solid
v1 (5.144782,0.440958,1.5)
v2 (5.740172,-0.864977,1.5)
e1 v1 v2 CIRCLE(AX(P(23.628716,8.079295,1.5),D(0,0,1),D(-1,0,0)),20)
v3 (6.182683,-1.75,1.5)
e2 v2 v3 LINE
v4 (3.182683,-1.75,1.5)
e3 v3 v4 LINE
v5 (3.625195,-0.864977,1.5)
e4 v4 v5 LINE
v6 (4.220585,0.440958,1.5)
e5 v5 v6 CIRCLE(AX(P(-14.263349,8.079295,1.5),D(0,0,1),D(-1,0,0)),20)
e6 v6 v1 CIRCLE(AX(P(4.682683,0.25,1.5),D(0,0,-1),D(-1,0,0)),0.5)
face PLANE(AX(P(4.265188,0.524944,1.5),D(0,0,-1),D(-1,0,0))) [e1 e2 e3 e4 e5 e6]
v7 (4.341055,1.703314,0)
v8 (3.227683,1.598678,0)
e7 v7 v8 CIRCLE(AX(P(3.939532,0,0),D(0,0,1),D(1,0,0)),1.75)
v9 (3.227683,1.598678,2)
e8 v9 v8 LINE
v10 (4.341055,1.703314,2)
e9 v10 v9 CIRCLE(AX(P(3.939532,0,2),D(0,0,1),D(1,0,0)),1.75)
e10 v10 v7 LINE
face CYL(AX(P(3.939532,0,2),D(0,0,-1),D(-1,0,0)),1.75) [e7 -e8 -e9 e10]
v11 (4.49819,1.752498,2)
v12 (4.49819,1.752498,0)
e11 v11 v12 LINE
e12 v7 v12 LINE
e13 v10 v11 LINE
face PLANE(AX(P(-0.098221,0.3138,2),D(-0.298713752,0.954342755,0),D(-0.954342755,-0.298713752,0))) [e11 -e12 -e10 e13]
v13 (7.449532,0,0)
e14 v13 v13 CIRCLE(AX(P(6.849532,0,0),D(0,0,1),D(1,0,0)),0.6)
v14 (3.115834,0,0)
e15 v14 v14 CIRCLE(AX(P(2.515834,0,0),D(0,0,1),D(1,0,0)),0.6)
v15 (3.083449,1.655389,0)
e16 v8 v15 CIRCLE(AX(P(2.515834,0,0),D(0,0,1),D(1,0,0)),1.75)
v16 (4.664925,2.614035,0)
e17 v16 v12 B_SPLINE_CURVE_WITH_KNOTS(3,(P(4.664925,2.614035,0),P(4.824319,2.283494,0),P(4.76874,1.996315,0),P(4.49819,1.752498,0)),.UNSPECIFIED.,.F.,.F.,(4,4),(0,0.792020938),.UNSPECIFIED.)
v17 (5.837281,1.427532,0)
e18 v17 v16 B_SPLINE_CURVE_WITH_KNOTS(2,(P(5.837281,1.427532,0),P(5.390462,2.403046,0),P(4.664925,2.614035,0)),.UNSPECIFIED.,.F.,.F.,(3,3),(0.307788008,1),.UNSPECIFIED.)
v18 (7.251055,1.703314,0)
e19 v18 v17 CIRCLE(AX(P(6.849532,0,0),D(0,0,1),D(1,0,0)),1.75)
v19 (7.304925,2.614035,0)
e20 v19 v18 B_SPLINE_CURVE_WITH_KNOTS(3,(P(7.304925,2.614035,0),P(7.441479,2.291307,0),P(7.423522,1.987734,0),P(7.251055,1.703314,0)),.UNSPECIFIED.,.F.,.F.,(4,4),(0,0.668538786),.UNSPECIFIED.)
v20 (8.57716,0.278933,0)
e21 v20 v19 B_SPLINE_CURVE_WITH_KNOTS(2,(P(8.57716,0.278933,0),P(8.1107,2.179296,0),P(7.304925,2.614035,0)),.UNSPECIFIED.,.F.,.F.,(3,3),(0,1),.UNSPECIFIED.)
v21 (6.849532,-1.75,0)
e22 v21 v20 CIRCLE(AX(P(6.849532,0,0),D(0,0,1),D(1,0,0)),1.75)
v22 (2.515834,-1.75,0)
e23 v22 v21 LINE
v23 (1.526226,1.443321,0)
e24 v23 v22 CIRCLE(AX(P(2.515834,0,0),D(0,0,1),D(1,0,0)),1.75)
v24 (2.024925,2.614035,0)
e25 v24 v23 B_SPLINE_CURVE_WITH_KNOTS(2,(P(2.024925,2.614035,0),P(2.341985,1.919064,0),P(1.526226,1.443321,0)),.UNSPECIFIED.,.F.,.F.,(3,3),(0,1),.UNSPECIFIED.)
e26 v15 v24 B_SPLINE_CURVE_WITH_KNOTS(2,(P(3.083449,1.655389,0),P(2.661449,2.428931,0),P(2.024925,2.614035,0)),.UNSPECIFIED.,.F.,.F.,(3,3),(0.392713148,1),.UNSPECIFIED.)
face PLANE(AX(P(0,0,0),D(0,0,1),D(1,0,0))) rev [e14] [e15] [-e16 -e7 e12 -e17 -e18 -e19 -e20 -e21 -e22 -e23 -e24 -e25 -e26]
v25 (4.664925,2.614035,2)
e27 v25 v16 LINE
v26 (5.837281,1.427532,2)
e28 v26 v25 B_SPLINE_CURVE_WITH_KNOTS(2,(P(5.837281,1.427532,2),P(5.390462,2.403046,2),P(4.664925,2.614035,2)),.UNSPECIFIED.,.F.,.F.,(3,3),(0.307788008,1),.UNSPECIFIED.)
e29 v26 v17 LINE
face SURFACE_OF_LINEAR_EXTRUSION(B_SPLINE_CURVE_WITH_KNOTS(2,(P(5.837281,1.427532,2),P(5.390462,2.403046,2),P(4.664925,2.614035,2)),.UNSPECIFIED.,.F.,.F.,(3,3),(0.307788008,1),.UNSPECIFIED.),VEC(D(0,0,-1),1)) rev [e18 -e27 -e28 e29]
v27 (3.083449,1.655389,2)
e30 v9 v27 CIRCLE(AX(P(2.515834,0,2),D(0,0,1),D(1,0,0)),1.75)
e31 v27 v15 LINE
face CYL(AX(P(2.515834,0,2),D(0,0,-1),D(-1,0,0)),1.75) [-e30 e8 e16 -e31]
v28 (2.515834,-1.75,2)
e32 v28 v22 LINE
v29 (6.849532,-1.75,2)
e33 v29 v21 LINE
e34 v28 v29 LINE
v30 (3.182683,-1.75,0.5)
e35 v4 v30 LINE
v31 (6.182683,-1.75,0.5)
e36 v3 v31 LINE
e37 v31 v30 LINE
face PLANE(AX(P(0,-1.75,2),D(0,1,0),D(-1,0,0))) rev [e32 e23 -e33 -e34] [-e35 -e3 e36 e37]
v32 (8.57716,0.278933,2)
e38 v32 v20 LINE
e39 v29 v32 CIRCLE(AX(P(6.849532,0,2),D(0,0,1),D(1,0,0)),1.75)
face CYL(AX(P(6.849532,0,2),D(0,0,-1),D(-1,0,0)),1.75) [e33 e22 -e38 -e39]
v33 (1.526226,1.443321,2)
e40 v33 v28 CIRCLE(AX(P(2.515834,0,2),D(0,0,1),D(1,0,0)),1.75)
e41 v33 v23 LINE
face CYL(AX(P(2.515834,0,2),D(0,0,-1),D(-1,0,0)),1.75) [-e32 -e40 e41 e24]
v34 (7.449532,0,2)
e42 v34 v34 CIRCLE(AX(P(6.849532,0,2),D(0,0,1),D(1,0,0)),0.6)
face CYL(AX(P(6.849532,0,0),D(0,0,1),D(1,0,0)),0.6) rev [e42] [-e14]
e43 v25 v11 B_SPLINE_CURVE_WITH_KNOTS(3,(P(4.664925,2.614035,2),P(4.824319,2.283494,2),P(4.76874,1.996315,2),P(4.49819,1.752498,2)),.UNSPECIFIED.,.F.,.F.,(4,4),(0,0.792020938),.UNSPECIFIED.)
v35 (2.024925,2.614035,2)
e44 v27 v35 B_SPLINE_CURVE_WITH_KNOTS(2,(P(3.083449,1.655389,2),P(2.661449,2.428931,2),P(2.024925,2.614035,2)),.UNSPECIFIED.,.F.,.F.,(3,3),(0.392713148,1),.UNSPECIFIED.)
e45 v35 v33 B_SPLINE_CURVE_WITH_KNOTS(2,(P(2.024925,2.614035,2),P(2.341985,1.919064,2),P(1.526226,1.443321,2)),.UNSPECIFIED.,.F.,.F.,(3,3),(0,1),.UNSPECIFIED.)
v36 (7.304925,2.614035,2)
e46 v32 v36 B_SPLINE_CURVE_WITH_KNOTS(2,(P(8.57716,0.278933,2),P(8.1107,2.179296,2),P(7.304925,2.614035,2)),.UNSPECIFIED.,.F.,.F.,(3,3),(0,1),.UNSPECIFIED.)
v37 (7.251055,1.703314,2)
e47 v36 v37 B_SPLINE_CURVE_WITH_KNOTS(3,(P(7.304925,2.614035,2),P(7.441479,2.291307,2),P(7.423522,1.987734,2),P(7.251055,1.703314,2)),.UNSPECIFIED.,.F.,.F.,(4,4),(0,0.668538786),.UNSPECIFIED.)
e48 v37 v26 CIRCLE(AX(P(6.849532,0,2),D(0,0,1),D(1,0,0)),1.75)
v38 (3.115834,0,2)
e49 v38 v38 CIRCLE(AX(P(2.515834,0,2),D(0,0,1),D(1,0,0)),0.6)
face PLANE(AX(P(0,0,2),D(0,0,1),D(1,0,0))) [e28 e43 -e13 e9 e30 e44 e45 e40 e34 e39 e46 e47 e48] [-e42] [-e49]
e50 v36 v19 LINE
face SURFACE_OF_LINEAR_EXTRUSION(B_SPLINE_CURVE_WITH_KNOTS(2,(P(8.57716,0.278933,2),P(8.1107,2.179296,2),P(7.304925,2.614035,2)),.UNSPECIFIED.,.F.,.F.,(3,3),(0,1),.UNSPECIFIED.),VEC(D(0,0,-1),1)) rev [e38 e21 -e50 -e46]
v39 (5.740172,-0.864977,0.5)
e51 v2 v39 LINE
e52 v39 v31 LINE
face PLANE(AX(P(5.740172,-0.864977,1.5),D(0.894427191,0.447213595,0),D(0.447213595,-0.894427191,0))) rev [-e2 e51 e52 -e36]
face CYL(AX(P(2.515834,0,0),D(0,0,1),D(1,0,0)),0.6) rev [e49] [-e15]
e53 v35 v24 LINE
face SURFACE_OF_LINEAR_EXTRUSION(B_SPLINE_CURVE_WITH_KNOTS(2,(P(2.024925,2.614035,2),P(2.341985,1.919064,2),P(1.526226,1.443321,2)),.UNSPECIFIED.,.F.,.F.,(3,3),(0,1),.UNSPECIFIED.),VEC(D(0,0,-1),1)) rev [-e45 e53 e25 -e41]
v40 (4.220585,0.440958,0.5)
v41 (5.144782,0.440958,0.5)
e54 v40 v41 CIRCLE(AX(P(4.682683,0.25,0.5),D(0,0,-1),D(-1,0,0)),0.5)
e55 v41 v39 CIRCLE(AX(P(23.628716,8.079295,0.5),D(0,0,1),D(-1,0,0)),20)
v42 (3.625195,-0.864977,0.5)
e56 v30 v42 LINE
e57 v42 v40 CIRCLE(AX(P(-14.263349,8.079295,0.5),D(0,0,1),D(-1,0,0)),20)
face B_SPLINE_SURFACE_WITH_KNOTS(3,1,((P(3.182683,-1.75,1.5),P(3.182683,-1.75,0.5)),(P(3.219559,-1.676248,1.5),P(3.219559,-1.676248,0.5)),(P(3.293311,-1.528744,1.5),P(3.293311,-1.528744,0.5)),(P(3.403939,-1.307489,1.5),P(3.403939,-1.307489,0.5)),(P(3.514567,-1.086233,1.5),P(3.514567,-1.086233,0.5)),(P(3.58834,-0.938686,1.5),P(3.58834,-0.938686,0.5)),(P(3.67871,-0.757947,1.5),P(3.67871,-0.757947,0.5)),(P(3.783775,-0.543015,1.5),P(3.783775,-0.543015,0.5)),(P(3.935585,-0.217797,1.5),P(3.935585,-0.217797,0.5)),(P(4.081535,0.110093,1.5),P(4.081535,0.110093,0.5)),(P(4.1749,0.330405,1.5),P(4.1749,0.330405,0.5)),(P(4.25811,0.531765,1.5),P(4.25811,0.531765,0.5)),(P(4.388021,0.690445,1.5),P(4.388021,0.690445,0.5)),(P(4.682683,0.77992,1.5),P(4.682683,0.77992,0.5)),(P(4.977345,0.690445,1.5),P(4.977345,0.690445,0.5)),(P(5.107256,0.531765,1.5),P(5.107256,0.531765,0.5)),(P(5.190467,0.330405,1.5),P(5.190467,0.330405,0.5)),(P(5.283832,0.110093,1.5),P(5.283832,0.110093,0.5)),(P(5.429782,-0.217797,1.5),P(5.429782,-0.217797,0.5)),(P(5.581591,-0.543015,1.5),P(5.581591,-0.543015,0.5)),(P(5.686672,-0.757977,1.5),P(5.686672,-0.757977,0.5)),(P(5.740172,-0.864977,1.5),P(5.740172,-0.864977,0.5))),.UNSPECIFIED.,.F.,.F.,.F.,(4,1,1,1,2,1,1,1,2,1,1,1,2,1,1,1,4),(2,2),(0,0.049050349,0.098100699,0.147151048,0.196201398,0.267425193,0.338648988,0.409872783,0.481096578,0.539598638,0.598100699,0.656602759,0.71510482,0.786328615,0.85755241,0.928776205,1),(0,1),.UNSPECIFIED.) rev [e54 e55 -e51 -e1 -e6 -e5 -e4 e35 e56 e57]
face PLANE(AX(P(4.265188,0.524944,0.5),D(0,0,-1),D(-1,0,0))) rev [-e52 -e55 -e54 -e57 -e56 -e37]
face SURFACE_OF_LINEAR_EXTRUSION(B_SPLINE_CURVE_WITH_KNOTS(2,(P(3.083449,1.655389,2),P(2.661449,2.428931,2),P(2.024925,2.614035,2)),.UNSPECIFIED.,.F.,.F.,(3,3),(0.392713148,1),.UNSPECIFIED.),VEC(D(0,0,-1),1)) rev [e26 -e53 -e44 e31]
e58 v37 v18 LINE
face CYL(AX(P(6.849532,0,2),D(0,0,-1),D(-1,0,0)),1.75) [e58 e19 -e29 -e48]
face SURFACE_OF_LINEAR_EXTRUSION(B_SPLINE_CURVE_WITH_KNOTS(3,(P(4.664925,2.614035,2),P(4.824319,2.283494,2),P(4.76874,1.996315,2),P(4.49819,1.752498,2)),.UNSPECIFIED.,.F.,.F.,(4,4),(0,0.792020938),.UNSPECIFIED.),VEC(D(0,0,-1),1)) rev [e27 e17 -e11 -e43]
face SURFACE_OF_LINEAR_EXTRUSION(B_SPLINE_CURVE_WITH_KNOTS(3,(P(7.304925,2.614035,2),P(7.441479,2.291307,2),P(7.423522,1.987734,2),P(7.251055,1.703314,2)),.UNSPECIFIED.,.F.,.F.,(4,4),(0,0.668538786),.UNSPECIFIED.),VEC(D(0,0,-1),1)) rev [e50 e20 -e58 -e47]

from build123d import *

# Parameters (mm, degrees)
BOSS_EXTRUDE1_DEPTH = 2
SKETCH2_R           = 0.6
CUT_EXTRUDE1_DEPTH  = 2
BOUNDARY_CUT1_START = 0.5
BOUNDARY_CUT1_DEPTH = 1


# Read off the part's stored shape, not the designer's step: Boundary-Cut1
with BuildPart() as part:
    # Sketch1 → Boss-Extrude1 (new body)
    with BuildSketch(Plane.XY):
        with BuildLine():
            ThreePointArc((1.526225881, 1.443320919), (0.844261398, -0.518019494), (2.515834251, -1.75))
            Line((2.515834251, -1.75), (6.849532383, -1.75))
            ThreePointArc((6.849532383, -1.75), (8.181942233, -1.134541314), (8.577159836, 0.278932579))
            add(Edge.make_bspline(
                [(8.577159836, 0.278932579), (8.110700048, 2.179296341), (7.304925461, 2.614034863)],
                knots=[0, 0, 0, 1, 1, 1], degree=2))
            add(Edge.make_bspline(
                [(7.304925461, 2.614034863), (7.441478628, 2.291307156), (7.423521915, 1.987733608), (7.251055322, 1.703314219)],
                knots=[0, 0, 0, 0, 0.668538786, 0.668538786, 0.668538786, 0.668538786], degree=3))
            ThreePointArc((7.251055322, 1.703314219), (6.514478451, 1.717625938), (5.837281377, 1.427532101))
            add(Edge.make_bspline(
                [(5.837281377, 1.427532101), (5.390462193, 2.403045527), (4.664925461, 2.614034863)],
                knots=[0.307788008, 0.307788008, 0.307788008, 1, 1, 1], degree=2))
            add(Edge.make_bspline(
                [(4.664925461, 2.614034863), (4.824318966, 2.283493667), (4.768740332, 1.996314703), (4.498189559, 1.752497972)],
                knots=[0, 0, 0, 0, 0.792020938, 0.792020938, 0.792020938, 0.792020938], degree=3))
            Line((4.498189559, 1.752497972), (4.341055322, 1.703314219))
            ThreePointArc((4.341055322, 1.703314219), (3.775786335, 1.742322367), (3.227683317, 1.598677862))
            ThreePointArc((3.227683317, 1.598677862), (3.156194107, 1.628631099), (3.083448661, 1.655389344))
            add(Edge.make_bspline(
                [(3.083448661, 1.655389344), (2.661448554, 2.428931092), (2.024925461, 2.614034863)],
                knots=[0.392713148, 0.392713148, 0.392713148, 1, 1, 1], degree=2))
            add(Edge.make_bspline(
                [(2.024925461, 2.614034863), (2.317287968, 1.973197345), (1.646435899, 1.518764796)],
                knots=[0, 0, 0, 0.922107406, 0.922107406, 0.922107406], degree=2))
            add(Edge.make_bspline(
                [(1.646435899, 1.518764796), (1.589767438, 1.480377803), (1.526225881, 1.443320919)],
                knots=[0.922107406, 0.922107406, 0.922107406, 1, 1, 1], degree=2))
        make_face()
    extrude(amount=BOSS_EXTRUDE1_DEPTH)

    # Sketch2 → Cut-Extrude1 (cut)
    with BuildSketch(Plane.XY.offset(2)):
        with Locations((6.849532383, 0)):
            Circle(SKETCH2_R)
        with Locations((2.515834251, 0)):
            Circle(SKETCH2_R)
    extrude(amount=-CUT_EXTRUDE1_DEPTH, mode=Mode.SUBTRACT)

    # Boundary-Cut1 outline → Boundary-Cut1 (cut)
    with BuildSketch(Plane.XY.offset(BOUNDARY_CUT1_START)):
        with BuildLine():
            add(Edge.make_bspline(
                [(3.182683317, -1.75), (3.219559269, -1.676248097), (3.293311172, -1.528744291), (3.403939026, -1.307488582), (3.51456688, -1.086232874), (3.588340093, -0.938686449), (3.678709694, -0.757947245), (3.783775446, -0.543015437), (3.935584986, -0.217797229), (4.081534514, 0.110092623), (4.174899608, 0.330404865), (4.258110172, 0.531765281), (4.388021164, 0.690444526), (4.682683317, 0.779920411), (4.97734547, 0.690444526), (5.107256462, 0.531765281), (5.190467027, 0.330404865), (5.28383212, 0.110092623), (5.429781648, -0.217797229), (5.581591188, -0.543015437), (5.686671615, -0.757976596), (5.7401719, -0.864977165)],
                knots=[0, 0, 0, 0, 0.049050349, 0.098100699, 0.147151048, 0.196201398, 0.196201398, 0.267425193, 0.338648988, 0.409872783, 0.481096578, 0.481096578, 0.539598638, 0.598100699, 0.656602759, 0.71510482, 0.71510482, 0.786328615, 0.85755241, 0.928776205, 1, 1, 1, 1], degree=3))
            Line((3.182683317, -1.75), (6.182683317, -1.75))
            Line((6.182683317, -1.75), (5.7401719, -0.864977165))
        make_face()
    extrude(amount=BOUNDARY_CUT1_DEPTH, mode=Mode.SUBTRACT)


solid = part.part
